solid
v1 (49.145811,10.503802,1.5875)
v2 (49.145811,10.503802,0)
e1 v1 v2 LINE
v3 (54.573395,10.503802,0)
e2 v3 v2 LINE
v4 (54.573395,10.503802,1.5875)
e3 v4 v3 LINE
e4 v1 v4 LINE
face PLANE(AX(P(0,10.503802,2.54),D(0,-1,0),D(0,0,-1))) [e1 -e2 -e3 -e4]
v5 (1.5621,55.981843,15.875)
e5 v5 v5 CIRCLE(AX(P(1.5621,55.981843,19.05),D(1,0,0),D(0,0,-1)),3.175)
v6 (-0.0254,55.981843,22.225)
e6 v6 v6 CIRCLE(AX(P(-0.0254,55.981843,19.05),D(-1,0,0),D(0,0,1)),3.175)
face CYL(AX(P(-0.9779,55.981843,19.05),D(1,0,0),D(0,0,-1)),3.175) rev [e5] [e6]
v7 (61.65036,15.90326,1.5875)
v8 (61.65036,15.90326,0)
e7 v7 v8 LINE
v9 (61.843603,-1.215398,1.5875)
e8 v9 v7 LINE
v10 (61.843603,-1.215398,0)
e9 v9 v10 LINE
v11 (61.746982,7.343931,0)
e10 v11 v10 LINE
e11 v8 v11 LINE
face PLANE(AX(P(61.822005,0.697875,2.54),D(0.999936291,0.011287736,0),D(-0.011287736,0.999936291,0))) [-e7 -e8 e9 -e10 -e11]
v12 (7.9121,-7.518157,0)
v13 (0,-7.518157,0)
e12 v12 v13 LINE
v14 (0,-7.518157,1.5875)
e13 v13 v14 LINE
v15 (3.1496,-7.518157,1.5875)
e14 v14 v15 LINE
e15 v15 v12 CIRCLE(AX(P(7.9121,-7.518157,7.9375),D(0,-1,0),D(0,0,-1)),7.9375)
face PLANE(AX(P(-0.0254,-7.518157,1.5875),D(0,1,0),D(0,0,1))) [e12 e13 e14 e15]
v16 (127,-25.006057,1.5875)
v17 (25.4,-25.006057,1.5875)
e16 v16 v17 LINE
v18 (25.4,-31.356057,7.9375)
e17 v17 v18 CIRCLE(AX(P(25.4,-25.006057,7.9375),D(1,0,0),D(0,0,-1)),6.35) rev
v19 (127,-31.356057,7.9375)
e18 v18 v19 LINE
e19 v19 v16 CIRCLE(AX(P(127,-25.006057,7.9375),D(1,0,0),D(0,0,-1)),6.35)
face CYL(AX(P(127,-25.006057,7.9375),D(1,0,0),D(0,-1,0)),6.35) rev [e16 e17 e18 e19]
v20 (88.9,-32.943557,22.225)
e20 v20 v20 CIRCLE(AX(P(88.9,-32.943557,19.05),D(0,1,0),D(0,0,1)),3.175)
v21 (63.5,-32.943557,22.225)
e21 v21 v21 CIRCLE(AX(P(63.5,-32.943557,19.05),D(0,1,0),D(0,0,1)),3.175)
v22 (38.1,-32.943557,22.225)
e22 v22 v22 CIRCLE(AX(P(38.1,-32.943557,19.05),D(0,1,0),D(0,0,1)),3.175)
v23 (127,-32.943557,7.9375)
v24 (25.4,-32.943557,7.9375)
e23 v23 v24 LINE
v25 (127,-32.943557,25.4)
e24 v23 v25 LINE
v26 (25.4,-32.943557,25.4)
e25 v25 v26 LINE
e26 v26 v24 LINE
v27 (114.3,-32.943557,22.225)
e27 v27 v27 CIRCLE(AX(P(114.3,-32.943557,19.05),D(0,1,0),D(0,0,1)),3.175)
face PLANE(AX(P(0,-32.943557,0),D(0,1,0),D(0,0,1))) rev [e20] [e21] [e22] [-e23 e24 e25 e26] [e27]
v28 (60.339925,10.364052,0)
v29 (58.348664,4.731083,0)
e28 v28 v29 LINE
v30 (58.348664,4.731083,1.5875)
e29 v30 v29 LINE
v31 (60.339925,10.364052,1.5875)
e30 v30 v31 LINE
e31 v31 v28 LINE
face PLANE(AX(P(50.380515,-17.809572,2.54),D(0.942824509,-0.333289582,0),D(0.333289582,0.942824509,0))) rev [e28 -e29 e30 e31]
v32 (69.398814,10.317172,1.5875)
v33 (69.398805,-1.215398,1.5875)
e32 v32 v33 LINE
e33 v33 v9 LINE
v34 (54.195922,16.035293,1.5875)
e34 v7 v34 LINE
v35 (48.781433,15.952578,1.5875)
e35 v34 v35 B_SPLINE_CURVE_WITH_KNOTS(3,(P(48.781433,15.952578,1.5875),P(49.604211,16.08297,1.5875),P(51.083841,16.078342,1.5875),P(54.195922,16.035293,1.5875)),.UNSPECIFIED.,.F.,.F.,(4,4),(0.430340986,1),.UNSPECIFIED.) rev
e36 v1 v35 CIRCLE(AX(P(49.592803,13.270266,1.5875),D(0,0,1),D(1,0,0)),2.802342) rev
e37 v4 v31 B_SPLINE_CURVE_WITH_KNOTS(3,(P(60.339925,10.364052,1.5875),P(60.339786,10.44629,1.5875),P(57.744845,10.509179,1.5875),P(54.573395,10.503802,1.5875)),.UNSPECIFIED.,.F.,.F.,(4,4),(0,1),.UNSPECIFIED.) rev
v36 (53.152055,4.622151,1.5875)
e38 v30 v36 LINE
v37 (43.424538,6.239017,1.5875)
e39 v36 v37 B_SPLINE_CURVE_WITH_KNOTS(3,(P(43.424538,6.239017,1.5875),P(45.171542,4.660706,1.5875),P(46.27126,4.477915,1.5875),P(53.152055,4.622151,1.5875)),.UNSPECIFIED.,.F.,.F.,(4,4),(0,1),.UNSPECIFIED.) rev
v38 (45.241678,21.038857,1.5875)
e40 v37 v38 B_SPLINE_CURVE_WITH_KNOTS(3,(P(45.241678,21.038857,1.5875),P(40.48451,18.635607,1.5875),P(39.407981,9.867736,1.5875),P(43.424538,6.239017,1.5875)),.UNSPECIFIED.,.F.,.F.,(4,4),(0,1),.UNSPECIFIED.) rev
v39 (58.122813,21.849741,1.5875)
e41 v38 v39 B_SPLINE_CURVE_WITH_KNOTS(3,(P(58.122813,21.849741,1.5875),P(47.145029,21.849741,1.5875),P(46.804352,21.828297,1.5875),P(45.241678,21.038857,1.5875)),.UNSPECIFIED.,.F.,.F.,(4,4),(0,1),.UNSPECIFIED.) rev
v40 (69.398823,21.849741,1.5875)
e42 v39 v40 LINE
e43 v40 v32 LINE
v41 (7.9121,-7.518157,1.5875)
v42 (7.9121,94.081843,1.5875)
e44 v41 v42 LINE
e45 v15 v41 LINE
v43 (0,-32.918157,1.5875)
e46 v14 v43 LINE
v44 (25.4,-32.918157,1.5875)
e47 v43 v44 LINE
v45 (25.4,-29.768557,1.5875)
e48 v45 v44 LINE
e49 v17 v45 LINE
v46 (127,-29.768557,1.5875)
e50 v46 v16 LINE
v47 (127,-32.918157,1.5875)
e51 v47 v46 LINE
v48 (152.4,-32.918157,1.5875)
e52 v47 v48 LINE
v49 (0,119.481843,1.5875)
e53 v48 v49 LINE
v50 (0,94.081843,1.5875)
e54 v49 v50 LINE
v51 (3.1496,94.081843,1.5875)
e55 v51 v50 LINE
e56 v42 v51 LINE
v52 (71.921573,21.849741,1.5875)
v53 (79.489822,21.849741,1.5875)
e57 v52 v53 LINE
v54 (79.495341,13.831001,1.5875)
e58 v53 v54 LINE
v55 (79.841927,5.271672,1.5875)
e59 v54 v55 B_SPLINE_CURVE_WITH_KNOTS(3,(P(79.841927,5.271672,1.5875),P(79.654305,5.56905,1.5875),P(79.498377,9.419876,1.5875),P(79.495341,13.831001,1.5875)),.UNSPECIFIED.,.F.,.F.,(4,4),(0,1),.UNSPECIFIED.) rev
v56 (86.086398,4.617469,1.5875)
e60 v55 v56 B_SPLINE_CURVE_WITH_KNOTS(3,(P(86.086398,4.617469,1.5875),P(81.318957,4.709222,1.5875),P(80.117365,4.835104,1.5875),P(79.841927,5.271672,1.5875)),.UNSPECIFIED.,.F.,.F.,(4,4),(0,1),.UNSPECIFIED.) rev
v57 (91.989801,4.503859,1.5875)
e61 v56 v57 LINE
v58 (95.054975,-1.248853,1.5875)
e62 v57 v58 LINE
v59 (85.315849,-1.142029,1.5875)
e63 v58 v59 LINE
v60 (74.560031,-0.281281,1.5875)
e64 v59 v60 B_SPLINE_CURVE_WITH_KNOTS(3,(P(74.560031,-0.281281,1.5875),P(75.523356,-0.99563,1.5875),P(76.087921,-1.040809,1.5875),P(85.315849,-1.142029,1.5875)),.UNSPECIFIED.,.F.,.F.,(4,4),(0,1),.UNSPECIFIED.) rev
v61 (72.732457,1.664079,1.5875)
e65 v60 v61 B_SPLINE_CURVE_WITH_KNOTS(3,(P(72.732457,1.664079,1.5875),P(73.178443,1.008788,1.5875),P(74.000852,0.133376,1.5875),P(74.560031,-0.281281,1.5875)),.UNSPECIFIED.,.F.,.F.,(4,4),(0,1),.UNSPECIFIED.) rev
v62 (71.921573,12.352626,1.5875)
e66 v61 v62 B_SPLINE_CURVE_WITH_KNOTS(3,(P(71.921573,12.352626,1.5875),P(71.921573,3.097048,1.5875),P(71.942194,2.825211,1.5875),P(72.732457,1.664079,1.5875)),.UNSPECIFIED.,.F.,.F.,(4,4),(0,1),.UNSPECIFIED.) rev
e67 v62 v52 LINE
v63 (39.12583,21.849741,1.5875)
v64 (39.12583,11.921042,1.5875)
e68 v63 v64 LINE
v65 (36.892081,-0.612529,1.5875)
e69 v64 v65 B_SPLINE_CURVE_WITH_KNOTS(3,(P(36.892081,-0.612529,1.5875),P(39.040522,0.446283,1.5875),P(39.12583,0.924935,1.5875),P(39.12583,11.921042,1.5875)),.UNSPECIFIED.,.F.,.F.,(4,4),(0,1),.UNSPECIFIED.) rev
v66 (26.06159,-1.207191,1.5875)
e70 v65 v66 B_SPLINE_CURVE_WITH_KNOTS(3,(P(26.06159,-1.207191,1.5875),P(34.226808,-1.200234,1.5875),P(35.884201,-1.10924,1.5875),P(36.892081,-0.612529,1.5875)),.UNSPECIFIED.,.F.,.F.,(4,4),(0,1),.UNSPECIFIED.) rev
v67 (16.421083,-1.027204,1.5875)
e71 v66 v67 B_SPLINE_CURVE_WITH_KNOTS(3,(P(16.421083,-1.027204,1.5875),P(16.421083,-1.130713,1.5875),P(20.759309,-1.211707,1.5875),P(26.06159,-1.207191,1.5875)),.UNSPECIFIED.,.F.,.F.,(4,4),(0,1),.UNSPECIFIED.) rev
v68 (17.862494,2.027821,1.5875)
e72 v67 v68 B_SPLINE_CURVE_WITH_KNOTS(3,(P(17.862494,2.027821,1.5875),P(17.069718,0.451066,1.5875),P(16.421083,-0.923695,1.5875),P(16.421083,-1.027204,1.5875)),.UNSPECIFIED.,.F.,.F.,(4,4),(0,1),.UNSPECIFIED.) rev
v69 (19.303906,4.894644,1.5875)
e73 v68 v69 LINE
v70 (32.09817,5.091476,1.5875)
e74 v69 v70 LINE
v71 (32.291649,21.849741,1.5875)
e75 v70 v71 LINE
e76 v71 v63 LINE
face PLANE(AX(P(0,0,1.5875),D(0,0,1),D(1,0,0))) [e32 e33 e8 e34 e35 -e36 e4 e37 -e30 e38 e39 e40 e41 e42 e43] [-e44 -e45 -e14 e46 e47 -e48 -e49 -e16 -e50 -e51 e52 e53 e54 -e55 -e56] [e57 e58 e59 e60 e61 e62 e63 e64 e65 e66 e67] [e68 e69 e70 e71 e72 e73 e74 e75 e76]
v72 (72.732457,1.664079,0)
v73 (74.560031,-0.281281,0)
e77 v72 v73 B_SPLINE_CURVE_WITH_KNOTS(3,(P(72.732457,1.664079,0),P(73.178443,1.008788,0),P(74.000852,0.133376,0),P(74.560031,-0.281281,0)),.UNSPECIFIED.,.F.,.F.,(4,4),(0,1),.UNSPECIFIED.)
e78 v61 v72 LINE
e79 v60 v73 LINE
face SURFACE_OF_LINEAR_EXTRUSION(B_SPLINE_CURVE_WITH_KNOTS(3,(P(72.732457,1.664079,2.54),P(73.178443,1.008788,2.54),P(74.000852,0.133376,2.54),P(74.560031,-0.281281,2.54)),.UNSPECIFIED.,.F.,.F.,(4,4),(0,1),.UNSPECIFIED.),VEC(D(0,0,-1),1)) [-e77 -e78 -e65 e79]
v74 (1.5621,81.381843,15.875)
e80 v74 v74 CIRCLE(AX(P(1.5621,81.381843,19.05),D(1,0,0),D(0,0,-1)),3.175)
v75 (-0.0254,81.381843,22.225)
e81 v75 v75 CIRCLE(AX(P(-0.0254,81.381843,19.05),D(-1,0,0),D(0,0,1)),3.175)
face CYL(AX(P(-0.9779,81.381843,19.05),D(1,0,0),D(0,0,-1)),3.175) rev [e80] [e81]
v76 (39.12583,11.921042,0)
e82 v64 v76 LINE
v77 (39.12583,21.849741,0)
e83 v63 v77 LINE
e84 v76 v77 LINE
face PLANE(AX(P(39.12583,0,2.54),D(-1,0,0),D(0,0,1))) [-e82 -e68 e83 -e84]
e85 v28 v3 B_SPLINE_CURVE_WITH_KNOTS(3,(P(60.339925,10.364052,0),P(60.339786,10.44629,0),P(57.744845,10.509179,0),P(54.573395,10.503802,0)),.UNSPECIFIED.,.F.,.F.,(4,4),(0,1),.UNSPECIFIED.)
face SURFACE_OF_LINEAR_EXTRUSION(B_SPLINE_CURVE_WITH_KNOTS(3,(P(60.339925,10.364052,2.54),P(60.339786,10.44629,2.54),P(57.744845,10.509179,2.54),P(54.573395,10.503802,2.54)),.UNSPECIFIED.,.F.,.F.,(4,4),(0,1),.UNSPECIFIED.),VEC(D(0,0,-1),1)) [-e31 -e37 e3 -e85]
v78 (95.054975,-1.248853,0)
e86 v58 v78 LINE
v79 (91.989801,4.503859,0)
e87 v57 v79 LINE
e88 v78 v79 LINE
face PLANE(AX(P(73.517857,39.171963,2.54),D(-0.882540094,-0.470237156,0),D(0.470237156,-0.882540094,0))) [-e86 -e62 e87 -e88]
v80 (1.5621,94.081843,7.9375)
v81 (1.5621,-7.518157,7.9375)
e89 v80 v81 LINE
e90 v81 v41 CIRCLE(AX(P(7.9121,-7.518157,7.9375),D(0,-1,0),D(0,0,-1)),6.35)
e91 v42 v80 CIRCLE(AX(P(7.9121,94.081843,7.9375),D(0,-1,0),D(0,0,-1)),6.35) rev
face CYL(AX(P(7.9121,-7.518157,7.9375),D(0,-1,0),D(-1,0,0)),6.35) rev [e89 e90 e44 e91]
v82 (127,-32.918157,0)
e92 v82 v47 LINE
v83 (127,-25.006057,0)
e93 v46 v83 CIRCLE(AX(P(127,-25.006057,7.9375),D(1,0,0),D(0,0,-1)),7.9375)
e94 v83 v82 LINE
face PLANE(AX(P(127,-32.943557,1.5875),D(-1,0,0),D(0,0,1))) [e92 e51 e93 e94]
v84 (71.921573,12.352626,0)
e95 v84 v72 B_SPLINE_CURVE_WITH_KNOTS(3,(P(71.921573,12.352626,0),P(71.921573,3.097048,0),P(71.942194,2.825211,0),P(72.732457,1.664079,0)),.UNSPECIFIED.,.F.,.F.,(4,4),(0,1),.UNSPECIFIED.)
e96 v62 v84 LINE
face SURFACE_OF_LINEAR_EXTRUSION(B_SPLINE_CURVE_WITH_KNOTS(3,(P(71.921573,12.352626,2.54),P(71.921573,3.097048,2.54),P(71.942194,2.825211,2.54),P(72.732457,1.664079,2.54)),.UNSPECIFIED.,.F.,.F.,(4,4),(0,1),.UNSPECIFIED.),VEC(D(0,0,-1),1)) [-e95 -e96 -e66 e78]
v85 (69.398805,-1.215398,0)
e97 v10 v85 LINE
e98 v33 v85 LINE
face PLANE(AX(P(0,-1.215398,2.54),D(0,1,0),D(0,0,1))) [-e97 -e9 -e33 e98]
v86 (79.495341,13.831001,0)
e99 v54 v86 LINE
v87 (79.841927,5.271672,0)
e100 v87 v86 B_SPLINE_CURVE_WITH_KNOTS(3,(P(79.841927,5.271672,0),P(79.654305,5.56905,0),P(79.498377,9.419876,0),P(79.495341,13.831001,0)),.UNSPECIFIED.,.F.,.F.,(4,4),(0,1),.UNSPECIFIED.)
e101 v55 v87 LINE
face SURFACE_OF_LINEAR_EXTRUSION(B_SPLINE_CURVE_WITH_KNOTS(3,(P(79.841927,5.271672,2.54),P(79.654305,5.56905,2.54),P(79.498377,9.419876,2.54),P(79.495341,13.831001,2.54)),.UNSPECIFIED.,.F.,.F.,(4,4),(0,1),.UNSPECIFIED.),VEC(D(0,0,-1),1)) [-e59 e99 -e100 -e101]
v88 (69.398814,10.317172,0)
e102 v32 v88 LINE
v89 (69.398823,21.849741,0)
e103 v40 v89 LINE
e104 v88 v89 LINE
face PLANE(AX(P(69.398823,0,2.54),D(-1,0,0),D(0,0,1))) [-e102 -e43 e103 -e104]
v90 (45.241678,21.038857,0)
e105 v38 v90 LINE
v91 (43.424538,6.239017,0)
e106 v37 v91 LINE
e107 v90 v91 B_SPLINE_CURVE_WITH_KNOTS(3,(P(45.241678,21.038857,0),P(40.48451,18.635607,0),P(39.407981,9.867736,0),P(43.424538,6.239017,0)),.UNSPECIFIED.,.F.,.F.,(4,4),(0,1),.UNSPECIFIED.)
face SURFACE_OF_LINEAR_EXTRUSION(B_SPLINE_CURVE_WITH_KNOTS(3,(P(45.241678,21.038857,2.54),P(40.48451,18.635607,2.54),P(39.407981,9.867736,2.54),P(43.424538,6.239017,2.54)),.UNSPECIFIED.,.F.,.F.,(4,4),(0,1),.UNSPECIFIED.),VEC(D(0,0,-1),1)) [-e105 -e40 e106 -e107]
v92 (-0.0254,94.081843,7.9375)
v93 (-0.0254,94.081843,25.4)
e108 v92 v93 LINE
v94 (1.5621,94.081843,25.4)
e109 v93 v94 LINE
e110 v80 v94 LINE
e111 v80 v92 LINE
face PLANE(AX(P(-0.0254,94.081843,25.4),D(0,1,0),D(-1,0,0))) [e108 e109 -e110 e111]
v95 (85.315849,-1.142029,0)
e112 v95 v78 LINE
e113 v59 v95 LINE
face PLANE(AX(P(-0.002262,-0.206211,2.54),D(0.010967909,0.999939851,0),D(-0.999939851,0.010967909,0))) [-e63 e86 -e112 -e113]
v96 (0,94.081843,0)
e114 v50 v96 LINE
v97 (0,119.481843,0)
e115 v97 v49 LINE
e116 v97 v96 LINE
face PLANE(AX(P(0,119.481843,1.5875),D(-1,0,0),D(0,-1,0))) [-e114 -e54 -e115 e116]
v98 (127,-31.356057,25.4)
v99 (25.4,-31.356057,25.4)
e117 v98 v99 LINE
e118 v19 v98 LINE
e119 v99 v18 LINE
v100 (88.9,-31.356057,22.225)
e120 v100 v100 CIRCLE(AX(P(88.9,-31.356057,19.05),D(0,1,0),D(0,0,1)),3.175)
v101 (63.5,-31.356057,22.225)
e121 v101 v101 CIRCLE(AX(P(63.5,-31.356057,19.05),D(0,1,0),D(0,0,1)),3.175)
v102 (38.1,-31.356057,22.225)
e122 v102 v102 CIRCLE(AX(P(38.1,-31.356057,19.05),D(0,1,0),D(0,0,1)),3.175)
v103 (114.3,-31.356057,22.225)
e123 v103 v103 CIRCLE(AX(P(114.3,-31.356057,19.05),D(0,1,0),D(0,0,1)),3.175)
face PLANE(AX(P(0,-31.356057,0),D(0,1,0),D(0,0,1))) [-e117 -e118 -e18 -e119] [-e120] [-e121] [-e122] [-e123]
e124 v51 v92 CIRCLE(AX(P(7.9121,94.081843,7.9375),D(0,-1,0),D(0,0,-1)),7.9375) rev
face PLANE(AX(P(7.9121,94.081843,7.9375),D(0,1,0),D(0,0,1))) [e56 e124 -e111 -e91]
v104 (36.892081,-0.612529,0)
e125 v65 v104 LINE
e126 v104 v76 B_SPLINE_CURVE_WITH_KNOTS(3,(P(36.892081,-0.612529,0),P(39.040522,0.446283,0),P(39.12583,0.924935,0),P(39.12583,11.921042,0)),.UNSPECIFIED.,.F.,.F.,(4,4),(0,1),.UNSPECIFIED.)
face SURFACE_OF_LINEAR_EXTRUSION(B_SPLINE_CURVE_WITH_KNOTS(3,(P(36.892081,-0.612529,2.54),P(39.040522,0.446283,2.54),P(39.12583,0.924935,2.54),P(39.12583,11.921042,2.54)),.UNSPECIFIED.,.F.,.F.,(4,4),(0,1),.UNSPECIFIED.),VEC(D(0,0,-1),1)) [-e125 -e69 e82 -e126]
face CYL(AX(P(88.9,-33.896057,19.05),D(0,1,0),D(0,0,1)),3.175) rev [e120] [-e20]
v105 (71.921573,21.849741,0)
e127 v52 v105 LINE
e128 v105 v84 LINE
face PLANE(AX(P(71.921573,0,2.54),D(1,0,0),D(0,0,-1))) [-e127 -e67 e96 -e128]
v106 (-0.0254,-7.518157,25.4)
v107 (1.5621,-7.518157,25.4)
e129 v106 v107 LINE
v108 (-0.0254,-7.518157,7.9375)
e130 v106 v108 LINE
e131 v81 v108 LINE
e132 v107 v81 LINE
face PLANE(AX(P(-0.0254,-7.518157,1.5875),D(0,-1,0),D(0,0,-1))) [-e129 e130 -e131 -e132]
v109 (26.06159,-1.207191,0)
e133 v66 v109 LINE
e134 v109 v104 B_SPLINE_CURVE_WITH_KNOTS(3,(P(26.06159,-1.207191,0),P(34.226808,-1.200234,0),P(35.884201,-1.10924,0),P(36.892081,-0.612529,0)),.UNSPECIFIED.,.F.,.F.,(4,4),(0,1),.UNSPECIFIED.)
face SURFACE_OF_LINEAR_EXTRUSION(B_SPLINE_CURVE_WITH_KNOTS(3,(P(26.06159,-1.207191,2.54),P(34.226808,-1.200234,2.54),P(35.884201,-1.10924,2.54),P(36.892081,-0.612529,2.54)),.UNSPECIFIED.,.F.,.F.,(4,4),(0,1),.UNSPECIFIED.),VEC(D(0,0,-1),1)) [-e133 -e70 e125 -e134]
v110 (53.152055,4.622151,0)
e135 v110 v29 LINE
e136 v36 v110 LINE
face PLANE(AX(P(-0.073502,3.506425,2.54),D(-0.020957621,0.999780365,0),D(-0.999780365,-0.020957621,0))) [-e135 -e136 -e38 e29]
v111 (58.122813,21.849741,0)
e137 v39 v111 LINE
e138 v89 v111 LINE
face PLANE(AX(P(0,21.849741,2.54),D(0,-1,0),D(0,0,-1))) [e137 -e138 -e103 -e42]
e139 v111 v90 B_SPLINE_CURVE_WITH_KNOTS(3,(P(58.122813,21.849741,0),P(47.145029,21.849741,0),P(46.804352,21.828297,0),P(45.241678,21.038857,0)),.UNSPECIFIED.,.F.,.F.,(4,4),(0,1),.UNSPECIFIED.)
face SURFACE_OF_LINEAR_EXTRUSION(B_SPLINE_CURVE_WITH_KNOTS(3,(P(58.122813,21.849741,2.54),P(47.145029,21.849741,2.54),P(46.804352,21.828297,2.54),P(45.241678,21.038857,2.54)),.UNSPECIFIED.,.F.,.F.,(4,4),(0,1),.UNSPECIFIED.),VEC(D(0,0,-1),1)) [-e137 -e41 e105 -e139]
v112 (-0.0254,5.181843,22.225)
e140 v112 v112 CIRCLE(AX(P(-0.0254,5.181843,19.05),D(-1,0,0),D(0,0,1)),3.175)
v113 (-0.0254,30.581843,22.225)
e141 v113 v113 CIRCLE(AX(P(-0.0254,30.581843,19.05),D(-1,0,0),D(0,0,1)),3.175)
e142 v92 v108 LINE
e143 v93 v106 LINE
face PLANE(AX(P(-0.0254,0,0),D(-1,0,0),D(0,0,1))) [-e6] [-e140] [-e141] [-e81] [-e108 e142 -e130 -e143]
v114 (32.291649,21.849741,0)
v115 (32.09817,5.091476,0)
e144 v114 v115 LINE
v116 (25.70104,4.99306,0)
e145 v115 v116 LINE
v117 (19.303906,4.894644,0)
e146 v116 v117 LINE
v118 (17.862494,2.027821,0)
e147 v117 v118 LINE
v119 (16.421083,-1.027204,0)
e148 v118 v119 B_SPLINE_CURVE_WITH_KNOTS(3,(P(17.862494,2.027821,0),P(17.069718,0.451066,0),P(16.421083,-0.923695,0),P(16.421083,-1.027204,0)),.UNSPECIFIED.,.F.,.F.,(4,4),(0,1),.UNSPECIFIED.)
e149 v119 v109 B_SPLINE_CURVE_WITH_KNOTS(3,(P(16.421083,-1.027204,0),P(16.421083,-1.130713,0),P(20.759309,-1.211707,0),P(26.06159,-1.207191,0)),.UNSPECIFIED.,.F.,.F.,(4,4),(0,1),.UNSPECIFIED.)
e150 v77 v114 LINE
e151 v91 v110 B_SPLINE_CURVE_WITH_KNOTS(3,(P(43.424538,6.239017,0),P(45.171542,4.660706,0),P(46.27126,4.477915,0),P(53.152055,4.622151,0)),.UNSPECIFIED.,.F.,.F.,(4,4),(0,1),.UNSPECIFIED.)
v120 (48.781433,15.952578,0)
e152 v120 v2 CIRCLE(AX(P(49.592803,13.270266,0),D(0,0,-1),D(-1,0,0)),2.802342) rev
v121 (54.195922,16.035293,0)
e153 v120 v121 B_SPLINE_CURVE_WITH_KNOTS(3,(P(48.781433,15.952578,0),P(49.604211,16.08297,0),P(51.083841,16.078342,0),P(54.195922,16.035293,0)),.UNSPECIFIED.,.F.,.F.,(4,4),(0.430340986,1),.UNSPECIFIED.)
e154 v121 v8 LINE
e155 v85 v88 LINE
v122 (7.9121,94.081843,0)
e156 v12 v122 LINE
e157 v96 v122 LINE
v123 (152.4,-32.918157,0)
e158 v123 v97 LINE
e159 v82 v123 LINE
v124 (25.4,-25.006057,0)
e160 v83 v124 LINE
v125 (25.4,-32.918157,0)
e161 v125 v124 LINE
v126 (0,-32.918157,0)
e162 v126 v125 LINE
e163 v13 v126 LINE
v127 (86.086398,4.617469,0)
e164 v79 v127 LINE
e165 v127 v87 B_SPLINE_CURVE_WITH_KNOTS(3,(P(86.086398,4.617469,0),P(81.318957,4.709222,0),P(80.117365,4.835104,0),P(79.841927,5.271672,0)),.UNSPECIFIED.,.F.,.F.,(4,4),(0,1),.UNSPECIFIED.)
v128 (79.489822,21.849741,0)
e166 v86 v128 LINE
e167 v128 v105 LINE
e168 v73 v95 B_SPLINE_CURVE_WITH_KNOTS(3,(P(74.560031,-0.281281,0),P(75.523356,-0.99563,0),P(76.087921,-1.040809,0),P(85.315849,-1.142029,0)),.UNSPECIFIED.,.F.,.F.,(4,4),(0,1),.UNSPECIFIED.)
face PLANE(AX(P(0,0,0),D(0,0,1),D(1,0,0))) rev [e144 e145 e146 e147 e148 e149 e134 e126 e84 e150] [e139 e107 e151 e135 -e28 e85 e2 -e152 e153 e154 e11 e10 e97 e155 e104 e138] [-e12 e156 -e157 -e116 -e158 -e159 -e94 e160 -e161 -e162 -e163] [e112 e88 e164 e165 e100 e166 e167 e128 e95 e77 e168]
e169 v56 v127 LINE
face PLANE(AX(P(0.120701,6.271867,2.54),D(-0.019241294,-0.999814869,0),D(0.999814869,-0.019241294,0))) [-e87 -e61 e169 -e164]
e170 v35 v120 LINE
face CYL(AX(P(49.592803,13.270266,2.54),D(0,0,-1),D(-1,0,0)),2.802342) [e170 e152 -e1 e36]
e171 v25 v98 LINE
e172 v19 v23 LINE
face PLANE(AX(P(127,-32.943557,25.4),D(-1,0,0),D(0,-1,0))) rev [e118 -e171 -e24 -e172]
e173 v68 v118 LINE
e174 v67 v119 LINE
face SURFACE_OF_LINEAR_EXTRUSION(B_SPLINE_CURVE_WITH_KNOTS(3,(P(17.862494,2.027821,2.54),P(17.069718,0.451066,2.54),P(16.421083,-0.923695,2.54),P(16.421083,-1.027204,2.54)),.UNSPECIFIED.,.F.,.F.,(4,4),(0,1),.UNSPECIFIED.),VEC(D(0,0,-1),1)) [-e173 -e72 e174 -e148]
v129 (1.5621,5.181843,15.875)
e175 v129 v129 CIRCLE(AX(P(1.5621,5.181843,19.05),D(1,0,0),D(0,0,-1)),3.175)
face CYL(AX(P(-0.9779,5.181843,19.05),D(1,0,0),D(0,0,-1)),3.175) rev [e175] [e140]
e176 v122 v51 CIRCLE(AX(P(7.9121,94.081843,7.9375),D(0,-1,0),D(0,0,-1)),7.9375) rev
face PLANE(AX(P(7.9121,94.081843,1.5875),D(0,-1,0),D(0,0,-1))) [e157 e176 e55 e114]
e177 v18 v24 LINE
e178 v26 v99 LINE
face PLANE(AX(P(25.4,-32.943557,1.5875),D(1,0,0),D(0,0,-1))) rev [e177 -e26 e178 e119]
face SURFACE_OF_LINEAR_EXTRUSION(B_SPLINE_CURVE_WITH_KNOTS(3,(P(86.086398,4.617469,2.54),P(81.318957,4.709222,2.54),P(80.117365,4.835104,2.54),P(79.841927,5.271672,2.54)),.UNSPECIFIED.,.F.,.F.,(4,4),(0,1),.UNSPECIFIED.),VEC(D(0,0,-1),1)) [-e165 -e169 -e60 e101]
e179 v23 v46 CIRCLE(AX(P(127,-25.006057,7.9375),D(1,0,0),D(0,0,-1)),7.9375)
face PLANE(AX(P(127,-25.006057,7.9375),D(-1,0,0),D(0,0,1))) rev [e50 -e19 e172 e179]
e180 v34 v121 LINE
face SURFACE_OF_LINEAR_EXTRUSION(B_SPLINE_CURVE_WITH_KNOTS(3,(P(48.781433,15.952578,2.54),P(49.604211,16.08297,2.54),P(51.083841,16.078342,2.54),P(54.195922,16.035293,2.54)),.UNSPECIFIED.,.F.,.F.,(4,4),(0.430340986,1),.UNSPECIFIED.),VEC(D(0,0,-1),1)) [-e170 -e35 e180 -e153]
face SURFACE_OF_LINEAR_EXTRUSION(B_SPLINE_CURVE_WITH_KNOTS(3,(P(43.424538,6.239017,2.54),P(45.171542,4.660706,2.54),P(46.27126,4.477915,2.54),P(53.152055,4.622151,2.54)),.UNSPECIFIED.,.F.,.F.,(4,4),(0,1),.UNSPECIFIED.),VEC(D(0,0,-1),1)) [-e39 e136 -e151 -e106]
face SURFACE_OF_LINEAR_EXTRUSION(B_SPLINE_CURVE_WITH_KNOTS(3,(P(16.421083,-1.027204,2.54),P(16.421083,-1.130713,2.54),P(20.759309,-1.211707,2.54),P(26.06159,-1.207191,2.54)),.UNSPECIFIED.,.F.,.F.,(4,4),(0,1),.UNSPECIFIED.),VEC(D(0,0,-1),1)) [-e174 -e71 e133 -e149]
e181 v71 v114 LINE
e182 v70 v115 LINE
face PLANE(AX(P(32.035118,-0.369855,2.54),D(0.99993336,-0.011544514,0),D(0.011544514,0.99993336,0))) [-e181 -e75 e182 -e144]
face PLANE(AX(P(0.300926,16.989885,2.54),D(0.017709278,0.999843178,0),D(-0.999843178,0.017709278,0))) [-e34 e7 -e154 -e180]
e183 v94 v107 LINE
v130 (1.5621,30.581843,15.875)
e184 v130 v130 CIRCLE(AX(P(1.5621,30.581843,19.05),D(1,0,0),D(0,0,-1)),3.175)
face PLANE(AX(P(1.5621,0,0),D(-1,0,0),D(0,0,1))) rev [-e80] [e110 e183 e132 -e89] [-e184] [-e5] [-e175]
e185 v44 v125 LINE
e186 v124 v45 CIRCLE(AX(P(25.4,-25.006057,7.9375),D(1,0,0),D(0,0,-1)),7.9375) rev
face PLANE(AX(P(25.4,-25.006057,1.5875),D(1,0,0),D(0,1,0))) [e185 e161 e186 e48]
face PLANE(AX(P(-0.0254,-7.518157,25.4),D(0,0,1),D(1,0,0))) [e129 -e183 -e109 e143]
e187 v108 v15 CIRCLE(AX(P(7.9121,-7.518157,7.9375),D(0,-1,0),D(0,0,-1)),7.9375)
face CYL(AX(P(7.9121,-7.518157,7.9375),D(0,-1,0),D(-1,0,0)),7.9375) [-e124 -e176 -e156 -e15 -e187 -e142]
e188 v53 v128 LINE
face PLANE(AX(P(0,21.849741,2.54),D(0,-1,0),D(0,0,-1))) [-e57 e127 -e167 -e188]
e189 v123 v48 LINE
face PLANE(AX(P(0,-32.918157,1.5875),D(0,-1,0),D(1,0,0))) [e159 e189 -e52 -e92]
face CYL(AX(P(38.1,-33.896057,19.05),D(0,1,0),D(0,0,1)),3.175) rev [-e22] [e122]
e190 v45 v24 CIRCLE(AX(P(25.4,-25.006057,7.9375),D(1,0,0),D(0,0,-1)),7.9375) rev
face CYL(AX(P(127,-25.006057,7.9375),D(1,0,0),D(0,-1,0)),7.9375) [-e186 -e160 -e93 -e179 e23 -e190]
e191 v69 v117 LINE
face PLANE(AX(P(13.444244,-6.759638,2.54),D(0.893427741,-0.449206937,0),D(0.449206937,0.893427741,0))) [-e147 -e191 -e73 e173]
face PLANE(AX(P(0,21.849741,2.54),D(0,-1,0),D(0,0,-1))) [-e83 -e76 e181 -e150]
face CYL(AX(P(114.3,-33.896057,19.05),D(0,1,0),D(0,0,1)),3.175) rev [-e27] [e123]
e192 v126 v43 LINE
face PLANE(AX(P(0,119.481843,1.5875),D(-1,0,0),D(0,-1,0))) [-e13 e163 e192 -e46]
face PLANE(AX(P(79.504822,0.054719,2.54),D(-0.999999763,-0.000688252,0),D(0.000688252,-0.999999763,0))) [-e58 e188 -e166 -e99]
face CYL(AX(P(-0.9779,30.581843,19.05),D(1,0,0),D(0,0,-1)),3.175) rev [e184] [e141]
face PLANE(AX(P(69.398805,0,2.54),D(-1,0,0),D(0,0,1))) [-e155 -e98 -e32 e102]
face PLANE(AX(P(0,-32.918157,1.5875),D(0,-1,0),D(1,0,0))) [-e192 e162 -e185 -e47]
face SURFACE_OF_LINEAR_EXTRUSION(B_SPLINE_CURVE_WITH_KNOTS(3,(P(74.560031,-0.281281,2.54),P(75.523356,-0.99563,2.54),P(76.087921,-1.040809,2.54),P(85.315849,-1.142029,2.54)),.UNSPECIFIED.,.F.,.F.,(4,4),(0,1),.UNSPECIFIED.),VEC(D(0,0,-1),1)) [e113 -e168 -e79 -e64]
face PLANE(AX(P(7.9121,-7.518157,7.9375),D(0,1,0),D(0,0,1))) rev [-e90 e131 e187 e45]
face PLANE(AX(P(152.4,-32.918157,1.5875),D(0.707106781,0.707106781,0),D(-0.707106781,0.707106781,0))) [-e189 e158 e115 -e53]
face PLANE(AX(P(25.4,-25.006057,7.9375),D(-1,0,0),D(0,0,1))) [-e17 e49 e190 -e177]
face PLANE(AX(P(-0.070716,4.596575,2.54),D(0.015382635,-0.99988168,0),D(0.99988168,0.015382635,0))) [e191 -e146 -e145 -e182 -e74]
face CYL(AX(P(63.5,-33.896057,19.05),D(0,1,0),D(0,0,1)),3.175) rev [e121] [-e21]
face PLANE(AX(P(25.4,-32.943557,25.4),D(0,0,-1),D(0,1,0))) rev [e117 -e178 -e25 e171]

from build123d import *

# Parameters (mm, degrees)
BOSS_EXTRUDE1_DEPTH          = 1.5875
SKETCH7_W                    = 1.5875
SKETCH7_H                    = 101.6
BOSS_EXTRUDE2_DEPTH          = 0.0254
EDGE_FLANGE1_STRIP_W         = 19.05
EDGE_FLANGE1_STRIP_H         = 1.5875
EDGE_FLANGE1_STRIP_CUT_DEPTH = 101.6
EDGE_FLANGE1_DEPTH           = 101.6
SKETCH11_W                   = 101.6
SKETCH11_H                   = 1.5875
BOSS_EXTRUDE3_DEPTH          = 0.0254
EDGE_FLANGE2_STRIP_W         = 19.05
EDGE_FLANGE2_STRIP_H         = 1.5875
EDGE_FLANGE2_STRIP_CUT_DEPTH = 101.6
EDGE_FLANGE2_DEPTH           = 101.6
SKETCH15_R                   = 3.175
CUT_EXTRUDE1_DEPTH           = 2.54
SKETCH16_R                   = 3.175
CUT_EXTRUDE2_DEPTH           = 2.54
CUT_EXTRUDE6_DEPTH           = 2.54


# Sheet-metal steps are written as plain solids
with BuildPart() as part:
    # Sketch1 → Boss-Extrude1 (new body)
    with BuildSketch(Plane.XY):
        Polygon((0, 119.481843199), (0, -32.918156801), (152.4, -32.918156801), align=None)
    extrude(amount=BOSS_EXTRUDE1_DEPTH)

    # Sketch7 → Boss-Extrude2 (add)
    with BuildSketch(Plane.ZY):
        with Locations((0.79375, 43.281843199)):
            Rectangle(SKETCH7_W, SKETCH7_H)
    extrude(amount=BOSS_EXTRUDE2_DEPTH)

    # Edge-Flange1 strip (across the edge) → Edge-Flange1 strip cut (cut)
    with BuildSketch(Plane(origin=(-0.0254, 94.081843199, 1.5875), x_dir=(1, 0, 0), z_dir=(0, -1, 0))):
        with Locations((-1.5875, -0.79375)):
            Rectangle(EDGE_FLANGE1_STRIP_W, EDGE_FLANGE1_STRIP_H)
    extrude(amount=EDGE_FLANGE1_STRIP_CUT_DEPTH, mode=Mode.SUBTRACT)

    # Edge-Flange1 section (across the edge) → Edge-Flange1 (add)
    with BuildSketch(Plane(origin=(-0.0254, 94.081843199, 1.5875), x_dir=(1, 0, 0), z_dir=(0, -1, 0))):
        with BuildLine():
            Line((0, 6.35), (0, 23.8125))
            Line((0, 23.8125), (1.5875, 23.8125))
            Line((1.5875, 23.8125), (1.5875, 6.35))
            ThreePointArc((1.5875, 6.35), (3.447371939, 1.859871939), (7.9375, 0))
            Line((7.9375, 0), (7.9375, -1.5875))
            ThreePointArc((7.9375, -1.5875), (2.324839924, 0.737339924), (0, 6.35))
        make_face()
    extrude(amount=EDGE_FLANGE1_DEPTH)

    # Sketch11 → Boss-Extrude3 (add)
    with BuildSketch(Plane(origin=(0, -32.918156801, 0), x_dir=(-1, 0, 0), z_dir=(0, -1, 0))):
        with Locations((-76.2, -0.79375)):
            Rectangle(SKETCH11_W, SKETCH11_H)
    extrude(amount=BOSS_EXTRUDE3_DEPTH)

    # Edge-Flange2 strip (across the edge) → Edge-Flange2 strip cut (cut)
    with BuildSketch(Plane(origin=(25.4, -32.943556801, 1.5875), x_dir=(0, 1, 0), z_dir=(1, 0, 0))):
        with Locations((-1.5875, -0.79375)):
            Rectangle(EDGE_FLANGE2_STRIP_W, EDGE_FLANGE2_STRIP_H)
    extrude(amount=EDGE_FLANGE2_STRIP_CUT_DEPTH, mode=Mode.SUBTRACT)

    # Edge-Flange2 section (across the edge) → Edge-Flange2 (add)
    with BuildSketch(Plane(origin=(25.4, -32.943556801, 1.5875), x_dir=(0, 1, 0), z_dir=(1, 0, 0))):
        with BuildLine():
            Line((0, 6.35), (0, 23.8125))
            Line((0, 23.8125), (1.5875, 23.8125))
            Line((1.5875, 23.8125), (1.5875, 6.35))
            ThreePointArc((1.5875, 6.35), (3.447371939, 1.859871939), (7.9375, 0))
            Line((7.9375, 0), (7.9375, -1.5875))
            ThreePointArc((7.9375, -1.5875), (2.324839924, 0.737339924), (0, 6.35))
        make_face()
    extrude(amount=EDGE_FLANGE2_DEPTH)

    # Sketch15 → Cut-Extrude1 (cut)
    with BuildSketch(Plane(origin=(0, -31.356056801, 0), x_dir=(1, 0, 0), z_dir=(0, 1, 0))):
        with Locations(Location((38.1, -19.05, 0), (0, 0, 270))):
            Circle(SKETCH15_R)
        with Locations(Location((63.5, -19.05, 0), (0, 0, 270))):
            Circle(SKETCH15_R)
        with Locations(Location((88.9, -19.05, 0), (0, 0, 270))):
            Circle(SKETCH15_R)
        with Locations(Location((114.3, -19.05, 0), (0, 0, 270))):
            Circle(SKETCH15_R)
    extrude(amount=-CUT_EXTRUDE1_DEPTH, mode=Mode.SUBTRACT)

    # Sketch16 → Cut-Extrude2 (cut)
    with BuildSketch(Plane(origin=(1.5621, 0, 0), x_dir=(0, 0, -1), z_dir=(1, 0, 0))):
        with Locations((-19.05, 81.381843199)):
            Circle(SKETCH16_R)
        with Locations((-19.05, 55.981843199)):
            Circle(SKETCH16_R)
        with Locations((-19.05, 30.581843199)):
            Circle(SKETCH16_R)
        with Locations((-19.05, 5.181843199)):
            Circle(SKETCH16_R)
    extrude(amount=-CUT_EXTRUDE2_DEPTH, mode=Mode.SUBTRACT)

    # Sketch23 → Cut-Extrude6 (cut)
    with BuildSketch(Plane(origin=(0, 0, 0), x_dir=(-1, 0, 0), z_dir=(0, 0, -1))):
        with BuildLine():
            Line((-54.573395113, 10.50380224), (-49.145810825, 10.50380224))
            ThreePointArc((-49.145810825, 10.50380224), (-46.796706145, 13.083281254), (-48.781433081, 15.952577991))
            add(Edge.make_bspline(
                [(-48.781433081, 15.952577991), (-49.604210691, 16.082970195), (-51.083841149, 16.078342253), (-54.195922097, 16.035293361)],
                knots=[0.430340986, 0.430340986, 0.430340986, 0.430340986, 1, 1, 1, 1], degree=3))
            Line((-54.195922097, 16.035293361), (-61.650359925, 15.903259941))
            Line((-61.650359925, 15.903259941), (-61.746981527, 7.343931221))
            Line((-61.746981527, 7.343931221), (-61.843602617, -1.215397719))
            Line((-61.843602617, -1.215397719), (-65.621203901, -1.215397719))
            Line((-65.621203901, -1.215397719), (-69.398804677, -1.215397719))
            Line((-69.398804677, -1.215397719), (-69.398822965, 10.317171545))
            Line((-69.398822965, 10.317171545), (-69.398822965, 21.849740809))
            Line((-69.398822965, 21.849740809), (-58.122813005, 21.849740809))
            add(Edge.make_bspline(
                [(-58.122813005, 21.849740809), (-47.145028509, 21.849740809), (-46.804351517, 21.828297113), (-45.241678493, 21.038856985)],
                knots=[0, 0, 0, 0, 1, 1, 1, 1], degree=3))
            add(Edge.make_bspline(
                [(-45.241678493, 21.038856985), (-40.484510461, 18.635606521), (-39.407981245, 9.867736325), (-43.424538109, 6.239017141)],
                knots=[0, 0, 0, 0, 1, 1, 1, 1], degree=3))
            add(Edge.make_bspline(
                [(-43.424538109, 6.239017141), (-45.171541981, 4.660705845), (-46.271260381, 4.477914745), (-53.152055357, 4.622150677)],
                knots=[0, 0, 0, 0, 1, 1, 1, 1], degree=3))
            Line((-53.152055357, 4.622150677), (-58.348663709, 4.731083149))
            Line((-58.348663709, 4.731083149), (-60.339924976, 10.364052271))
            add(Edge.make_bspline(
                [(-60.339924976, 10.364052271), (-60.339785544, 10.446289733), (-57.744845223, 10.50917935), (-54.573395113, 10.50380224)],
                knots=[0, 0, 0, 0, 1, 1, 1, 1], degree=3))
        make_face()
        with BuildLine():
            Line((-93.522388131, 1.627502866), (-91.989800897, 4.503859321))
            Line((-91.989800897, 4.503859321), (-86.086398429, 4.617469457))
            add(Edge.make_bspline(
                [(-86.086398429, 4.617469457), (-81.318957113, 4.709221877), (-80.117365409, 4.835103769), (-79.841927301, 5.271672365)],
                knots=[0, 0, 0, 0, 1, 1, 1, 1], degree=3))
            add(Edge.make_bspline(
                [(-79.841927301, 5.271672365), (-79.654305121, 5.569050485), (-79.498376553, 9.419876413), (-79.495340745, 13.831000941)],
                knots=[0, 0, 0, 0, 1, 1, 1, 1], degree=3))
            Line((-79.495340745, 13.831000941), (-79.489821833, 21.849740809))
            Line((-79.489821833, 21.849740809), (-75.705697829, 21.849740809))
            Line((-75.705697829, 21.849740809), (-71.921573317, 21.849740809))
            Line((-71.921573317, 21.849740809), (-71.921573317, 12.352626453))
            add(Edge.make_bspline(
                [(-71.921573317, 12.352626453), (-71.921573317, 3.097047809), (-71.942194053, 2.825210913), (-72.732457141, 1.664079377)],
                knots=[0, 0, 0, 0, 1, 1, 1, 1], degree=3))
            add(Edge.make_bspline(
                [(-72.732457141, 1.664079377), (-73.178443041, 1.008787825), (-74.000851861, 0.133375809), (-74.560031337, -0.281281223)],
                knots=[0, 0, 0, 0, 1, 1, 1, 1], degree=3))
            add(Edge.make_bspline(
                [(-74.560031337, -0.281281223), (-75.523356309, -0.995630315), (-76.087920585, -1.040808787), (-85.315848789, -1.142028803)],
                knots=[0, 0, 0, 0, 1, 1, 1, 1], degree=3))
            Line((-85.315848789, -1.142028803), (-95.054974853, -1.248853075))
            Line((-95.054974853, -1.248853075), (-93.522388131, 1.627502866))
        make_face()
        with BuildLine():
            Line((-39.125829917, 11.921041845), (-39.125829917, 21.849740809))
            Line((-39.125829917, 21.849740809), (-35.708737437, 21.849740809))
            Line((-35.708737437, 21.849740809), (-32.291649021, 21.849740809))
            Line((-32.291649021, 21.849740809), (-32.194909565, 13.470608469))
            Line((-32.194909565, 13.470608469), (-32.098170109, 5.091476129))
            Line((-32.098170109, 5.091476129), (-25.701039901, 4.993059765))
            Line((-25.701039901, 4.993059765), (-19.303905629, 4.894643909))
            Line((-19.303905629, 4.894643909), (-17.862494237, 2.027820585))
            add(Edge.make_bspline(
                [(-17.862494237, 2.027820585), (-17.069717565, 0.451065801), (-16.421082845, -0.923695483), (-16.421082845, -1.027204039)],
                knots=[0, 0, 0, 0, 1, 1, 1, 1], degree=3))
            add(Edge.make_bspline(
                [(-16.421082845, -1.027204039), (-16.421082845, -1.130712595), (-20.759309373, -1.211707099), (-26.061589853, -1.207191487)],
                knots=[0, 0, 0, 0, 1, 1, 1, 1], degree=3))
            add(Edge.make_bspline(
                [(-26.061589853, -1.207191487), (-34.226807965, -1.200233919), (-35.884200637, -1.109240451), (-36.892080765, -0.612529227)],
                knots=[0, 0, 0, 0, 1, 1, 1, 1], degree=3))
            add(Edge.make_bspline(
                [(-36.892080765, -0.612529227), (-39.040522493, 0.446283489), (-39.125829917, 0.924935313), (-39.125829917, 11.921041845)],
                knots=[0, 0, 0, 0, 1, 1, 1, 1], degree=3))
        make_face()
    extrude(amount=-CUT_EXTRUDE6_DEPTH, mode=Mode.SUBTRACT)


solid = part.part
